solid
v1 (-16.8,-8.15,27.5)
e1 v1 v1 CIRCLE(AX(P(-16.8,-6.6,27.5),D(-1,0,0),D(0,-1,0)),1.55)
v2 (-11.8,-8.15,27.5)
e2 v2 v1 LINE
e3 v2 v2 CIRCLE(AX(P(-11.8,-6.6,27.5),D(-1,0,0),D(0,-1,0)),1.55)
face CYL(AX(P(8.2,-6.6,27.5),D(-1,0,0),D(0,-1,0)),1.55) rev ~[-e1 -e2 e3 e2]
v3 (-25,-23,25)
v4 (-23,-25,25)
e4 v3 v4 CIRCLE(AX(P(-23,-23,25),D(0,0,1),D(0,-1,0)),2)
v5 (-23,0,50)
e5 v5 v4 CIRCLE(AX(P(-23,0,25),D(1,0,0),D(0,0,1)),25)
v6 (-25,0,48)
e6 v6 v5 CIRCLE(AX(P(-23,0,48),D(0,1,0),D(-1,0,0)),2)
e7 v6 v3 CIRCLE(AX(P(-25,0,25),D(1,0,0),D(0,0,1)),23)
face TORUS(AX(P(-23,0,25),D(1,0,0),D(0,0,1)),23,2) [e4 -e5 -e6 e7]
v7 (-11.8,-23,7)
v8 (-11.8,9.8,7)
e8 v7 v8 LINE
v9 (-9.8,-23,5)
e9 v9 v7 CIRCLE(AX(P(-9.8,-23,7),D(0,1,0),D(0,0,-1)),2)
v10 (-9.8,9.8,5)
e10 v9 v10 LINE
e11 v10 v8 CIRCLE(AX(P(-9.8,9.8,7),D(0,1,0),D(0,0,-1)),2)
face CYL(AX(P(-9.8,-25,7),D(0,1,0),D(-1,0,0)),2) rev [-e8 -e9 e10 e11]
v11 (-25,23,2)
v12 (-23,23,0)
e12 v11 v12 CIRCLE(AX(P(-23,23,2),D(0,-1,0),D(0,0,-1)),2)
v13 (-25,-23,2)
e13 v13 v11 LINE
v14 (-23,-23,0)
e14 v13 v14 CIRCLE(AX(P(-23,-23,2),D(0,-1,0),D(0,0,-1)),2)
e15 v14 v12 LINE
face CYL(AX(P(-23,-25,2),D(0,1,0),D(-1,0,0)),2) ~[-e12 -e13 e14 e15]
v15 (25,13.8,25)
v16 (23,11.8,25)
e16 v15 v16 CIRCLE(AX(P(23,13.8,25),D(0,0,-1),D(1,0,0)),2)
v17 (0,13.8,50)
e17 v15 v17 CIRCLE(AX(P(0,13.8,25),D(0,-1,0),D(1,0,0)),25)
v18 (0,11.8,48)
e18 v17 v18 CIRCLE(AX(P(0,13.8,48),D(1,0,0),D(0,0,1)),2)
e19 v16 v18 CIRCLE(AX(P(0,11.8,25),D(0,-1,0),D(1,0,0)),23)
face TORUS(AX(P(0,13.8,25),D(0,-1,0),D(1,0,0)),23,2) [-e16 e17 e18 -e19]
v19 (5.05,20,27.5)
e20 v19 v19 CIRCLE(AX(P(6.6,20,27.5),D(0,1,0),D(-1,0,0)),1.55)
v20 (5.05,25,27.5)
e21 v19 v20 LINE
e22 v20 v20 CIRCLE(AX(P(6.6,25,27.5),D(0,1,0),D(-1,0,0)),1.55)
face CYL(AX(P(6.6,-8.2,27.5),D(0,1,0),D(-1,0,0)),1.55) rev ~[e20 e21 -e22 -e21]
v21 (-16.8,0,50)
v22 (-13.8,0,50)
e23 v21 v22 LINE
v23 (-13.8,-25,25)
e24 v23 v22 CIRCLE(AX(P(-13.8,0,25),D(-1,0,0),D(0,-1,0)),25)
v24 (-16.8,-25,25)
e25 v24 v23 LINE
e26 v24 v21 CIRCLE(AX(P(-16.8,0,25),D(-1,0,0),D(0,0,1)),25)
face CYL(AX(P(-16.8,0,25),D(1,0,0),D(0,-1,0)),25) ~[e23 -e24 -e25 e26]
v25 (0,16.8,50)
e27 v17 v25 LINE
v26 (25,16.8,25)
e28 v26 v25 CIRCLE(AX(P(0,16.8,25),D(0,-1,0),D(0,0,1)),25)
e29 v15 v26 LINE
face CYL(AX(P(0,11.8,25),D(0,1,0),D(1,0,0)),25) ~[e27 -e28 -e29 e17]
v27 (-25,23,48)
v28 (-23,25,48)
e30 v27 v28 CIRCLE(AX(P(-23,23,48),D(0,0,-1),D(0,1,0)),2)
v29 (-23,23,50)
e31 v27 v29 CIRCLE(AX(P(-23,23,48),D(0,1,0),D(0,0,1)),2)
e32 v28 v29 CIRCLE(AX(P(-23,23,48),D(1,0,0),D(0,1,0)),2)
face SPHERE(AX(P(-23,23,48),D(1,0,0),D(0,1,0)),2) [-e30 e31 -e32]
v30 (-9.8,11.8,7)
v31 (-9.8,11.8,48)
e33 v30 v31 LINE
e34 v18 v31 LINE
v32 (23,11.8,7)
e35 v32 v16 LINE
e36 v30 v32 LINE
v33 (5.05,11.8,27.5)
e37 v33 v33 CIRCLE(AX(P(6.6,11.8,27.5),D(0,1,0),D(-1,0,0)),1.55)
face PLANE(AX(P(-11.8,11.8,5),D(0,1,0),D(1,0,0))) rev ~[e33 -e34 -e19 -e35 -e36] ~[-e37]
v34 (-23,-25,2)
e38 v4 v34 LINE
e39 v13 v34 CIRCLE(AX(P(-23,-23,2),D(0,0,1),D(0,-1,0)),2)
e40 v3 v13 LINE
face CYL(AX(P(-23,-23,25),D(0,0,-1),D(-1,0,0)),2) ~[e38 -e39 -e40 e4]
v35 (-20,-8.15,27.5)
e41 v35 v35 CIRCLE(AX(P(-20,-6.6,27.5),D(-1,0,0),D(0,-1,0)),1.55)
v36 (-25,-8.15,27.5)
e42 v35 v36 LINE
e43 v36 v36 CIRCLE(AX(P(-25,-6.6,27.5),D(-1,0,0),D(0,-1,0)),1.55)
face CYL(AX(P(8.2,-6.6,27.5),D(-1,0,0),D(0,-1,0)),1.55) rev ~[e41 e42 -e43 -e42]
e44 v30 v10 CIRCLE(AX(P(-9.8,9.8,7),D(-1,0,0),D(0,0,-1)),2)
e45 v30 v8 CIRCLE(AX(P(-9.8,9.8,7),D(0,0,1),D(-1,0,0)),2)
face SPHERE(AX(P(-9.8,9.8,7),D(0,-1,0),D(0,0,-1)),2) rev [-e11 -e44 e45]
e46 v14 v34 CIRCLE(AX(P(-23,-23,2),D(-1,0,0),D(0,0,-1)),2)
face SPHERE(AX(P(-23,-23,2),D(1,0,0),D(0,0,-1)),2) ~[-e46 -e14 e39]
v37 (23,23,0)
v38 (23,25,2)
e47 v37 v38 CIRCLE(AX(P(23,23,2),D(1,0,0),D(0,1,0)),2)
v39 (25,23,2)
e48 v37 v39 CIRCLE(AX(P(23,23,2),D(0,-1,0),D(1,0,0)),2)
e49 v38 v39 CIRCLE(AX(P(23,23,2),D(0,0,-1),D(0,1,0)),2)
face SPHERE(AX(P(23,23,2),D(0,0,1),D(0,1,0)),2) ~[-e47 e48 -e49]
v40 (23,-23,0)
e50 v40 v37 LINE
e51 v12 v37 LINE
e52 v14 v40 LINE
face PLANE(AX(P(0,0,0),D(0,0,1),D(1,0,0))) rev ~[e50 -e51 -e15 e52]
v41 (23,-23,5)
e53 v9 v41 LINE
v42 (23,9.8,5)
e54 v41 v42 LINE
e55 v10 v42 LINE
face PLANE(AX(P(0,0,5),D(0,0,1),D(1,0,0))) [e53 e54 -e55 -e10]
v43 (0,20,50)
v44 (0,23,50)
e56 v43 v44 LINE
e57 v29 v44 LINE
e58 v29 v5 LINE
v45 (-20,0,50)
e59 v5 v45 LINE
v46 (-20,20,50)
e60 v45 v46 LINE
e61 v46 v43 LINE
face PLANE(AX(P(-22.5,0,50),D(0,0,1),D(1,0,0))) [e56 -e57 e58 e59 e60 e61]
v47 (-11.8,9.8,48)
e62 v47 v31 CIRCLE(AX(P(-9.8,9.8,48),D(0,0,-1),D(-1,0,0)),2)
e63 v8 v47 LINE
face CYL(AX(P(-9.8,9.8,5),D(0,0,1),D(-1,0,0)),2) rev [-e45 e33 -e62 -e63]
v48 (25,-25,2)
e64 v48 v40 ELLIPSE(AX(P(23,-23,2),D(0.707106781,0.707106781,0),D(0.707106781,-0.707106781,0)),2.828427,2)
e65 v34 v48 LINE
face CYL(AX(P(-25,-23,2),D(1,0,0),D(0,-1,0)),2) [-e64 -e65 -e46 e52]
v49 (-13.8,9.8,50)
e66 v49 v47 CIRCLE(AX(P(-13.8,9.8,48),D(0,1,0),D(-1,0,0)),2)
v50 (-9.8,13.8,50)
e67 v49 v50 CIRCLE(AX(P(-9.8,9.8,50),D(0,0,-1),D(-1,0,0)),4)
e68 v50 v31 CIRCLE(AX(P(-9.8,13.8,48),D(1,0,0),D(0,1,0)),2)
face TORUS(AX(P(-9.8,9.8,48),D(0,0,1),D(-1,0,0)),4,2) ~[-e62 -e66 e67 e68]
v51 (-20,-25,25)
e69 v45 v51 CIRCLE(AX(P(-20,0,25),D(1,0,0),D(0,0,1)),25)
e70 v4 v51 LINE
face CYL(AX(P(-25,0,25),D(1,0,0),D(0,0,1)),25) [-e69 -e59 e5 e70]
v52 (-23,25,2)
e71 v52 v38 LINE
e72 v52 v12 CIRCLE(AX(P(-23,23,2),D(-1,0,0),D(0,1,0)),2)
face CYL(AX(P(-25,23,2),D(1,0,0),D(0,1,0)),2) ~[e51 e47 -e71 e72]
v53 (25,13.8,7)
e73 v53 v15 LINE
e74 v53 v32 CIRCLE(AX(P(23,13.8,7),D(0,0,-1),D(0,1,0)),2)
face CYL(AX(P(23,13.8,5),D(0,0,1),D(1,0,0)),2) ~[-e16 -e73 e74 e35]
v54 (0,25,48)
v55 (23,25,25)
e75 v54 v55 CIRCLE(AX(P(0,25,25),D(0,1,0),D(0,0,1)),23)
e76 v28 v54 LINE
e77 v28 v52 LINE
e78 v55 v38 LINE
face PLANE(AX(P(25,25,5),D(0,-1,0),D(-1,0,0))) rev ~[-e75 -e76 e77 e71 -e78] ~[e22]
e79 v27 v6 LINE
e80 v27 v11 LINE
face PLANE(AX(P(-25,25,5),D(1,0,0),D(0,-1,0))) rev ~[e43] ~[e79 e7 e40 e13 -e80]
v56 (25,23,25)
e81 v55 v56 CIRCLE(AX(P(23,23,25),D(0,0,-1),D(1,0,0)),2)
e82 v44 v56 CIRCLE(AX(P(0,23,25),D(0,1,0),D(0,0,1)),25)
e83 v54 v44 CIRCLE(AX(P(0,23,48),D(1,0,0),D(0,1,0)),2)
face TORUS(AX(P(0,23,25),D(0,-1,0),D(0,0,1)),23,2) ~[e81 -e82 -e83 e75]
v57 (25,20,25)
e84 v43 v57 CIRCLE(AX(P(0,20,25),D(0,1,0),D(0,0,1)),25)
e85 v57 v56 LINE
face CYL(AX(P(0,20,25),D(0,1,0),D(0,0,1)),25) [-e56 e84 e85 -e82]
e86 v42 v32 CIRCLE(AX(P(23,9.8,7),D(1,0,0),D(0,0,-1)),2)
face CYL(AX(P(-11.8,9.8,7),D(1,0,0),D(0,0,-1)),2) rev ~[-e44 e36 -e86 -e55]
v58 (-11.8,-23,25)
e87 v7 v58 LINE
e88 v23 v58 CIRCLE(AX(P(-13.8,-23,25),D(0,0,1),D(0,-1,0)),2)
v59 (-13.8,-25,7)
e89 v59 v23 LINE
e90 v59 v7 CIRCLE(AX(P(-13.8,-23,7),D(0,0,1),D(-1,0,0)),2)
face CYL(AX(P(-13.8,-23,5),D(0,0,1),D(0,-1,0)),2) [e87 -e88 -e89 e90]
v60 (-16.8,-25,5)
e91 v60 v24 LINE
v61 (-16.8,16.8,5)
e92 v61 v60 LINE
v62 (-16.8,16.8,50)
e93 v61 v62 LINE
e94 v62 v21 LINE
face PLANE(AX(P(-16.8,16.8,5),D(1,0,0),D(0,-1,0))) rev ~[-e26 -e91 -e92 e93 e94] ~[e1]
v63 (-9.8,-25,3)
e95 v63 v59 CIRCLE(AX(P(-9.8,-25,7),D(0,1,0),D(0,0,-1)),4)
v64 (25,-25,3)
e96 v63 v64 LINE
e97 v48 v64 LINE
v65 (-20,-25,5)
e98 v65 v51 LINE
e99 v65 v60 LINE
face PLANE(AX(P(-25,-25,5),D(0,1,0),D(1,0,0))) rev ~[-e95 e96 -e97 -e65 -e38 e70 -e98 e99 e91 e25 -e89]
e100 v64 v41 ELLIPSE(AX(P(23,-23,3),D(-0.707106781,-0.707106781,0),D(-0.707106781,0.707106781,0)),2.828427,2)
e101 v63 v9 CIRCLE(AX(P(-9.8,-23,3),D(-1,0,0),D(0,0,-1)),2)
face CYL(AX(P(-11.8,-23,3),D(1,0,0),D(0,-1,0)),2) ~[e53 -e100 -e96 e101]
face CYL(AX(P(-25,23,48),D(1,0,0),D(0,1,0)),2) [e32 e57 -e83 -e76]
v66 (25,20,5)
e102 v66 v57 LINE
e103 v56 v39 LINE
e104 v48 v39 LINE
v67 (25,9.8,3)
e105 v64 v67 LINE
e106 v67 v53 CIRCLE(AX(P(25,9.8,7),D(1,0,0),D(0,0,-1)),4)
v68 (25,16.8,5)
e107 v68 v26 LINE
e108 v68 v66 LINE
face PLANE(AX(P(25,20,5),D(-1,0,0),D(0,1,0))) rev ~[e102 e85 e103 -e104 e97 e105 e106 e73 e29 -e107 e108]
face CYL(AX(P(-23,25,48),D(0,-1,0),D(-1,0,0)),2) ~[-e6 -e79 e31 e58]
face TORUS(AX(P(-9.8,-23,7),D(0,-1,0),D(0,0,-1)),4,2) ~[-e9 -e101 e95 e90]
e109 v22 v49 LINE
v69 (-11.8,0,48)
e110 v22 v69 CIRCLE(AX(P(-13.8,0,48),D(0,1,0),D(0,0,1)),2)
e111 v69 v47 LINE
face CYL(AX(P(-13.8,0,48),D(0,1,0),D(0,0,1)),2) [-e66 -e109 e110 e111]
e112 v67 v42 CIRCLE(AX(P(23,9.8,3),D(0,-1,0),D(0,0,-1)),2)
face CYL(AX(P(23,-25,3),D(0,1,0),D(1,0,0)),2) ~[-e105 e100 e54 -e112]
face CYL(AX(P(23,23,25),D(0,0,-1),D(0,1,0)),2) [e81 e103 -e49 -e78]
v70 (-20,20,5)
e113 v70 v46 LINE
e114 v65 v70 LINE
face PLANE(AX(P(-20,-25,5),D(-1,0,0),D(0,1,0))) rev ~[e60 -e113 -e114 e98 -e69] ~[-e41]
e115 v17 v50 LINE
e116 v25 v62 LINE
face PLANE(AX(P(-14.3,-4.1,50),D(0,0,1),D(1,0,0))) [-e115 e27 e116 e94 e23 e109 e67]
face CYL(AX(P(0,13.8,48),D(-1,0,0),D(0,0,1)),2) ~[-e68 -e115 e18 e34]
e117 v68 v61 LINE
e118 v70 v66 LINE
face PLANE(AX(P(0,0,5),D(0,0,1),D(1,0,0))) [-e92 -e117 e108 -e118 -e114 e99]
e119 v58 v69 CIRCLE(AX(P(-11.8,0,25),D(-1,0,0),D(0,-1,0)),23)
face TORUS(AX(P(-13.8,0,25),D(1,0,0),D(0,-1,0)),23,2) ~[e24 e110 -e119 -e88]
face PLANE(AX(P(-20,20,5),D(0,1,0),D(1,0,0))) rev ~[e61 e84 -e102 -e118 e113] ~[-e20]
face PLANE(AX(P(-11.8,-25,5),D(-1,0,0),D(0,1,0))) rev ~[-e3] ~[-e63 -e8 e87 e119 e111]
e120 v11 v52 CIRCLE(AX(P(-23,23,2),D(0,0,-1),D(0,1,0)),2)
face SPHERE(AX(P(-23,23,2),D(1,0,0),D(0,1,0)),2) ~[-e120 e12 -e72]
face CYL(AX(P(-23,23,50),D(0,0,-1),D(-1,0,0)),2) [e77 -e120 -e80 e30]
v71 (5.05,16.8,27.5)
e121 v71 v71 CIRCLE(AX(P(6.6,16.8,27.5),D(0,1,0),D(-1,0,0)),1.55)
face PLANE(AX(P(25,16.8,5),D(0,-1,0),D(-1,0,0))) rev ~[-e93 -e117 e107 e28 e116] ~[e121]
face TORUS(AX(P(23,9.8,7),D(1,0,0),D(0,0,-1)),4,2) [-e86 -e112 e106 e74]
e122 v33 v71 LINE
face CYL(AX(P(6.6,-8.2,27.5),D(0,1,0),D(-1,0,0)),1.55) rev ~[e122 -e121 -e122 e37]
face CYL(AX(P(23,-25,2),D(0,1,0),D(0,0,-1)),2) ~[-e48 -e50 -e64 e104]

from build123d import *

# Parameters (mm, degrees)
F0_W            = 50
F0_H            = 50
F1_DEPTH        = 5
F2_W            = 45
F2_H            = 5
F3_DEPTH        = 45
F4_W            = 36.8
F4_H            = 5
F5_DEPTH        = 45
F6_R            = 25
F7_R            = 2
F10_D           = 3.1
F10_DEPTH       = 20
F10_TIP         = 0.9313339595
F10_ON_F9_D     = 3.1
F10_ON_F9_DEPTH = 20
F10_ON_F9_TIP   = 0.9313339595


with BuildPart() as f1:
    # F0 (on Top) → F1 (new body)
    with BuildSketch(Plane.XY):
        Rectangle(F0_W, F0_H)
    extrude(amount=F1_DEPTH)

    # F2 (on face) → F3 (join)
    with BuildSketch(Plane.XY.offset(5)):
        Polygon((-20, 25), (-25, 25), (-25, -25), (-20, -25), (-20, 20), align=None)
        with Locations((2.5, 22.5)):
            Rectangle(F2_W, F2_H)
    extrude(amount=F3_DEPTH)

    # F4 (on face) → F5 (join, through all)
    with BuildSketch(Plane.XY.offset(5)):
        Polygon((-16.8, 16.8), (-16.8, -25), (-11.8, -25), (-11.8, 11.8), (-11.8, 16.8), align=None)
        with Locations((6.6, 14.3)):
            Rectangle(F4_W, F4_H)
    extrude(amount=F5_DEPTH)

    # F6
    f6_edges = [f1.edges().sort_by_distance(p)[0] for p in [
        (-22.5, -25, 50),
        (-14.3, -25, 50),
        (25, 14.3, 50),
        (25, 22.5, 50),
    ]]
    fillet(f6_edges, radius=F6_R)

    # F7
    f7_edges = [f1.edges().sort_by_distance(p)[0] for p in [
        (25, 25, 12.5),
        (17.67767, 25, 42.67767),
        (0, 25, 0),
        (-12.5, 25, 50),
        (-25, 25, 25),
        (0, -25, 0),
        (25, 0, 0),
        (-25, 0, 0),
        (-25, 12.5, 50),
        (-25, -17.67767, 42.67767),
        (-25, -25, 12.5),
        (-11.8, -6.6, 5),
        (6.6, 11.8, 5),
        (25, -6.6, 5),
        (6.6, -25, 5),
        (-11.8, 11.8, 27.5),
        (-11.8, -25, 15),
        (25, 11.8, 15),
        (-11.8, -17.67767, 42.67767),
        (-11.8, 5.9, 50),
        (17.67767, 11.8, 42.67767),
        (-5.9, 11.8, 50),
    ]]
    fillet(f7_edges, radius=F7_R)

    # F10
    with Locations(Plane.YZ.offset(-11.8)):
        with Locations((-6.6, 27.5)):
            Hole(F10_D / 2, depth=F10_DEPTH)
            with Locations((0, 0, -(F10_DEPTH + F10_TIP / 2))):  # 118° drill point
                Cone(0, F10_D / 2, F10_TIP, mode=Mode.SUBTRACT)

    # F10 on F9
    with Locations(Plane.XZ.offset(-11.8)):
        with Locations((6.6, 27.5)):
            Hole(F10_ON_F9_D / 2, depth=F10_ON_F9_DEPTH)
            with Locations((0, 0, -(F10_ON_F9_DEPTH + F10_ON_F9_TIP / 2))):  # 118° drill point
                Cone(0, F10_ON_F9_D / 2, F10_ON_F9_TIP, mode=Mode.SUBTRACT)


solid = f1.part
